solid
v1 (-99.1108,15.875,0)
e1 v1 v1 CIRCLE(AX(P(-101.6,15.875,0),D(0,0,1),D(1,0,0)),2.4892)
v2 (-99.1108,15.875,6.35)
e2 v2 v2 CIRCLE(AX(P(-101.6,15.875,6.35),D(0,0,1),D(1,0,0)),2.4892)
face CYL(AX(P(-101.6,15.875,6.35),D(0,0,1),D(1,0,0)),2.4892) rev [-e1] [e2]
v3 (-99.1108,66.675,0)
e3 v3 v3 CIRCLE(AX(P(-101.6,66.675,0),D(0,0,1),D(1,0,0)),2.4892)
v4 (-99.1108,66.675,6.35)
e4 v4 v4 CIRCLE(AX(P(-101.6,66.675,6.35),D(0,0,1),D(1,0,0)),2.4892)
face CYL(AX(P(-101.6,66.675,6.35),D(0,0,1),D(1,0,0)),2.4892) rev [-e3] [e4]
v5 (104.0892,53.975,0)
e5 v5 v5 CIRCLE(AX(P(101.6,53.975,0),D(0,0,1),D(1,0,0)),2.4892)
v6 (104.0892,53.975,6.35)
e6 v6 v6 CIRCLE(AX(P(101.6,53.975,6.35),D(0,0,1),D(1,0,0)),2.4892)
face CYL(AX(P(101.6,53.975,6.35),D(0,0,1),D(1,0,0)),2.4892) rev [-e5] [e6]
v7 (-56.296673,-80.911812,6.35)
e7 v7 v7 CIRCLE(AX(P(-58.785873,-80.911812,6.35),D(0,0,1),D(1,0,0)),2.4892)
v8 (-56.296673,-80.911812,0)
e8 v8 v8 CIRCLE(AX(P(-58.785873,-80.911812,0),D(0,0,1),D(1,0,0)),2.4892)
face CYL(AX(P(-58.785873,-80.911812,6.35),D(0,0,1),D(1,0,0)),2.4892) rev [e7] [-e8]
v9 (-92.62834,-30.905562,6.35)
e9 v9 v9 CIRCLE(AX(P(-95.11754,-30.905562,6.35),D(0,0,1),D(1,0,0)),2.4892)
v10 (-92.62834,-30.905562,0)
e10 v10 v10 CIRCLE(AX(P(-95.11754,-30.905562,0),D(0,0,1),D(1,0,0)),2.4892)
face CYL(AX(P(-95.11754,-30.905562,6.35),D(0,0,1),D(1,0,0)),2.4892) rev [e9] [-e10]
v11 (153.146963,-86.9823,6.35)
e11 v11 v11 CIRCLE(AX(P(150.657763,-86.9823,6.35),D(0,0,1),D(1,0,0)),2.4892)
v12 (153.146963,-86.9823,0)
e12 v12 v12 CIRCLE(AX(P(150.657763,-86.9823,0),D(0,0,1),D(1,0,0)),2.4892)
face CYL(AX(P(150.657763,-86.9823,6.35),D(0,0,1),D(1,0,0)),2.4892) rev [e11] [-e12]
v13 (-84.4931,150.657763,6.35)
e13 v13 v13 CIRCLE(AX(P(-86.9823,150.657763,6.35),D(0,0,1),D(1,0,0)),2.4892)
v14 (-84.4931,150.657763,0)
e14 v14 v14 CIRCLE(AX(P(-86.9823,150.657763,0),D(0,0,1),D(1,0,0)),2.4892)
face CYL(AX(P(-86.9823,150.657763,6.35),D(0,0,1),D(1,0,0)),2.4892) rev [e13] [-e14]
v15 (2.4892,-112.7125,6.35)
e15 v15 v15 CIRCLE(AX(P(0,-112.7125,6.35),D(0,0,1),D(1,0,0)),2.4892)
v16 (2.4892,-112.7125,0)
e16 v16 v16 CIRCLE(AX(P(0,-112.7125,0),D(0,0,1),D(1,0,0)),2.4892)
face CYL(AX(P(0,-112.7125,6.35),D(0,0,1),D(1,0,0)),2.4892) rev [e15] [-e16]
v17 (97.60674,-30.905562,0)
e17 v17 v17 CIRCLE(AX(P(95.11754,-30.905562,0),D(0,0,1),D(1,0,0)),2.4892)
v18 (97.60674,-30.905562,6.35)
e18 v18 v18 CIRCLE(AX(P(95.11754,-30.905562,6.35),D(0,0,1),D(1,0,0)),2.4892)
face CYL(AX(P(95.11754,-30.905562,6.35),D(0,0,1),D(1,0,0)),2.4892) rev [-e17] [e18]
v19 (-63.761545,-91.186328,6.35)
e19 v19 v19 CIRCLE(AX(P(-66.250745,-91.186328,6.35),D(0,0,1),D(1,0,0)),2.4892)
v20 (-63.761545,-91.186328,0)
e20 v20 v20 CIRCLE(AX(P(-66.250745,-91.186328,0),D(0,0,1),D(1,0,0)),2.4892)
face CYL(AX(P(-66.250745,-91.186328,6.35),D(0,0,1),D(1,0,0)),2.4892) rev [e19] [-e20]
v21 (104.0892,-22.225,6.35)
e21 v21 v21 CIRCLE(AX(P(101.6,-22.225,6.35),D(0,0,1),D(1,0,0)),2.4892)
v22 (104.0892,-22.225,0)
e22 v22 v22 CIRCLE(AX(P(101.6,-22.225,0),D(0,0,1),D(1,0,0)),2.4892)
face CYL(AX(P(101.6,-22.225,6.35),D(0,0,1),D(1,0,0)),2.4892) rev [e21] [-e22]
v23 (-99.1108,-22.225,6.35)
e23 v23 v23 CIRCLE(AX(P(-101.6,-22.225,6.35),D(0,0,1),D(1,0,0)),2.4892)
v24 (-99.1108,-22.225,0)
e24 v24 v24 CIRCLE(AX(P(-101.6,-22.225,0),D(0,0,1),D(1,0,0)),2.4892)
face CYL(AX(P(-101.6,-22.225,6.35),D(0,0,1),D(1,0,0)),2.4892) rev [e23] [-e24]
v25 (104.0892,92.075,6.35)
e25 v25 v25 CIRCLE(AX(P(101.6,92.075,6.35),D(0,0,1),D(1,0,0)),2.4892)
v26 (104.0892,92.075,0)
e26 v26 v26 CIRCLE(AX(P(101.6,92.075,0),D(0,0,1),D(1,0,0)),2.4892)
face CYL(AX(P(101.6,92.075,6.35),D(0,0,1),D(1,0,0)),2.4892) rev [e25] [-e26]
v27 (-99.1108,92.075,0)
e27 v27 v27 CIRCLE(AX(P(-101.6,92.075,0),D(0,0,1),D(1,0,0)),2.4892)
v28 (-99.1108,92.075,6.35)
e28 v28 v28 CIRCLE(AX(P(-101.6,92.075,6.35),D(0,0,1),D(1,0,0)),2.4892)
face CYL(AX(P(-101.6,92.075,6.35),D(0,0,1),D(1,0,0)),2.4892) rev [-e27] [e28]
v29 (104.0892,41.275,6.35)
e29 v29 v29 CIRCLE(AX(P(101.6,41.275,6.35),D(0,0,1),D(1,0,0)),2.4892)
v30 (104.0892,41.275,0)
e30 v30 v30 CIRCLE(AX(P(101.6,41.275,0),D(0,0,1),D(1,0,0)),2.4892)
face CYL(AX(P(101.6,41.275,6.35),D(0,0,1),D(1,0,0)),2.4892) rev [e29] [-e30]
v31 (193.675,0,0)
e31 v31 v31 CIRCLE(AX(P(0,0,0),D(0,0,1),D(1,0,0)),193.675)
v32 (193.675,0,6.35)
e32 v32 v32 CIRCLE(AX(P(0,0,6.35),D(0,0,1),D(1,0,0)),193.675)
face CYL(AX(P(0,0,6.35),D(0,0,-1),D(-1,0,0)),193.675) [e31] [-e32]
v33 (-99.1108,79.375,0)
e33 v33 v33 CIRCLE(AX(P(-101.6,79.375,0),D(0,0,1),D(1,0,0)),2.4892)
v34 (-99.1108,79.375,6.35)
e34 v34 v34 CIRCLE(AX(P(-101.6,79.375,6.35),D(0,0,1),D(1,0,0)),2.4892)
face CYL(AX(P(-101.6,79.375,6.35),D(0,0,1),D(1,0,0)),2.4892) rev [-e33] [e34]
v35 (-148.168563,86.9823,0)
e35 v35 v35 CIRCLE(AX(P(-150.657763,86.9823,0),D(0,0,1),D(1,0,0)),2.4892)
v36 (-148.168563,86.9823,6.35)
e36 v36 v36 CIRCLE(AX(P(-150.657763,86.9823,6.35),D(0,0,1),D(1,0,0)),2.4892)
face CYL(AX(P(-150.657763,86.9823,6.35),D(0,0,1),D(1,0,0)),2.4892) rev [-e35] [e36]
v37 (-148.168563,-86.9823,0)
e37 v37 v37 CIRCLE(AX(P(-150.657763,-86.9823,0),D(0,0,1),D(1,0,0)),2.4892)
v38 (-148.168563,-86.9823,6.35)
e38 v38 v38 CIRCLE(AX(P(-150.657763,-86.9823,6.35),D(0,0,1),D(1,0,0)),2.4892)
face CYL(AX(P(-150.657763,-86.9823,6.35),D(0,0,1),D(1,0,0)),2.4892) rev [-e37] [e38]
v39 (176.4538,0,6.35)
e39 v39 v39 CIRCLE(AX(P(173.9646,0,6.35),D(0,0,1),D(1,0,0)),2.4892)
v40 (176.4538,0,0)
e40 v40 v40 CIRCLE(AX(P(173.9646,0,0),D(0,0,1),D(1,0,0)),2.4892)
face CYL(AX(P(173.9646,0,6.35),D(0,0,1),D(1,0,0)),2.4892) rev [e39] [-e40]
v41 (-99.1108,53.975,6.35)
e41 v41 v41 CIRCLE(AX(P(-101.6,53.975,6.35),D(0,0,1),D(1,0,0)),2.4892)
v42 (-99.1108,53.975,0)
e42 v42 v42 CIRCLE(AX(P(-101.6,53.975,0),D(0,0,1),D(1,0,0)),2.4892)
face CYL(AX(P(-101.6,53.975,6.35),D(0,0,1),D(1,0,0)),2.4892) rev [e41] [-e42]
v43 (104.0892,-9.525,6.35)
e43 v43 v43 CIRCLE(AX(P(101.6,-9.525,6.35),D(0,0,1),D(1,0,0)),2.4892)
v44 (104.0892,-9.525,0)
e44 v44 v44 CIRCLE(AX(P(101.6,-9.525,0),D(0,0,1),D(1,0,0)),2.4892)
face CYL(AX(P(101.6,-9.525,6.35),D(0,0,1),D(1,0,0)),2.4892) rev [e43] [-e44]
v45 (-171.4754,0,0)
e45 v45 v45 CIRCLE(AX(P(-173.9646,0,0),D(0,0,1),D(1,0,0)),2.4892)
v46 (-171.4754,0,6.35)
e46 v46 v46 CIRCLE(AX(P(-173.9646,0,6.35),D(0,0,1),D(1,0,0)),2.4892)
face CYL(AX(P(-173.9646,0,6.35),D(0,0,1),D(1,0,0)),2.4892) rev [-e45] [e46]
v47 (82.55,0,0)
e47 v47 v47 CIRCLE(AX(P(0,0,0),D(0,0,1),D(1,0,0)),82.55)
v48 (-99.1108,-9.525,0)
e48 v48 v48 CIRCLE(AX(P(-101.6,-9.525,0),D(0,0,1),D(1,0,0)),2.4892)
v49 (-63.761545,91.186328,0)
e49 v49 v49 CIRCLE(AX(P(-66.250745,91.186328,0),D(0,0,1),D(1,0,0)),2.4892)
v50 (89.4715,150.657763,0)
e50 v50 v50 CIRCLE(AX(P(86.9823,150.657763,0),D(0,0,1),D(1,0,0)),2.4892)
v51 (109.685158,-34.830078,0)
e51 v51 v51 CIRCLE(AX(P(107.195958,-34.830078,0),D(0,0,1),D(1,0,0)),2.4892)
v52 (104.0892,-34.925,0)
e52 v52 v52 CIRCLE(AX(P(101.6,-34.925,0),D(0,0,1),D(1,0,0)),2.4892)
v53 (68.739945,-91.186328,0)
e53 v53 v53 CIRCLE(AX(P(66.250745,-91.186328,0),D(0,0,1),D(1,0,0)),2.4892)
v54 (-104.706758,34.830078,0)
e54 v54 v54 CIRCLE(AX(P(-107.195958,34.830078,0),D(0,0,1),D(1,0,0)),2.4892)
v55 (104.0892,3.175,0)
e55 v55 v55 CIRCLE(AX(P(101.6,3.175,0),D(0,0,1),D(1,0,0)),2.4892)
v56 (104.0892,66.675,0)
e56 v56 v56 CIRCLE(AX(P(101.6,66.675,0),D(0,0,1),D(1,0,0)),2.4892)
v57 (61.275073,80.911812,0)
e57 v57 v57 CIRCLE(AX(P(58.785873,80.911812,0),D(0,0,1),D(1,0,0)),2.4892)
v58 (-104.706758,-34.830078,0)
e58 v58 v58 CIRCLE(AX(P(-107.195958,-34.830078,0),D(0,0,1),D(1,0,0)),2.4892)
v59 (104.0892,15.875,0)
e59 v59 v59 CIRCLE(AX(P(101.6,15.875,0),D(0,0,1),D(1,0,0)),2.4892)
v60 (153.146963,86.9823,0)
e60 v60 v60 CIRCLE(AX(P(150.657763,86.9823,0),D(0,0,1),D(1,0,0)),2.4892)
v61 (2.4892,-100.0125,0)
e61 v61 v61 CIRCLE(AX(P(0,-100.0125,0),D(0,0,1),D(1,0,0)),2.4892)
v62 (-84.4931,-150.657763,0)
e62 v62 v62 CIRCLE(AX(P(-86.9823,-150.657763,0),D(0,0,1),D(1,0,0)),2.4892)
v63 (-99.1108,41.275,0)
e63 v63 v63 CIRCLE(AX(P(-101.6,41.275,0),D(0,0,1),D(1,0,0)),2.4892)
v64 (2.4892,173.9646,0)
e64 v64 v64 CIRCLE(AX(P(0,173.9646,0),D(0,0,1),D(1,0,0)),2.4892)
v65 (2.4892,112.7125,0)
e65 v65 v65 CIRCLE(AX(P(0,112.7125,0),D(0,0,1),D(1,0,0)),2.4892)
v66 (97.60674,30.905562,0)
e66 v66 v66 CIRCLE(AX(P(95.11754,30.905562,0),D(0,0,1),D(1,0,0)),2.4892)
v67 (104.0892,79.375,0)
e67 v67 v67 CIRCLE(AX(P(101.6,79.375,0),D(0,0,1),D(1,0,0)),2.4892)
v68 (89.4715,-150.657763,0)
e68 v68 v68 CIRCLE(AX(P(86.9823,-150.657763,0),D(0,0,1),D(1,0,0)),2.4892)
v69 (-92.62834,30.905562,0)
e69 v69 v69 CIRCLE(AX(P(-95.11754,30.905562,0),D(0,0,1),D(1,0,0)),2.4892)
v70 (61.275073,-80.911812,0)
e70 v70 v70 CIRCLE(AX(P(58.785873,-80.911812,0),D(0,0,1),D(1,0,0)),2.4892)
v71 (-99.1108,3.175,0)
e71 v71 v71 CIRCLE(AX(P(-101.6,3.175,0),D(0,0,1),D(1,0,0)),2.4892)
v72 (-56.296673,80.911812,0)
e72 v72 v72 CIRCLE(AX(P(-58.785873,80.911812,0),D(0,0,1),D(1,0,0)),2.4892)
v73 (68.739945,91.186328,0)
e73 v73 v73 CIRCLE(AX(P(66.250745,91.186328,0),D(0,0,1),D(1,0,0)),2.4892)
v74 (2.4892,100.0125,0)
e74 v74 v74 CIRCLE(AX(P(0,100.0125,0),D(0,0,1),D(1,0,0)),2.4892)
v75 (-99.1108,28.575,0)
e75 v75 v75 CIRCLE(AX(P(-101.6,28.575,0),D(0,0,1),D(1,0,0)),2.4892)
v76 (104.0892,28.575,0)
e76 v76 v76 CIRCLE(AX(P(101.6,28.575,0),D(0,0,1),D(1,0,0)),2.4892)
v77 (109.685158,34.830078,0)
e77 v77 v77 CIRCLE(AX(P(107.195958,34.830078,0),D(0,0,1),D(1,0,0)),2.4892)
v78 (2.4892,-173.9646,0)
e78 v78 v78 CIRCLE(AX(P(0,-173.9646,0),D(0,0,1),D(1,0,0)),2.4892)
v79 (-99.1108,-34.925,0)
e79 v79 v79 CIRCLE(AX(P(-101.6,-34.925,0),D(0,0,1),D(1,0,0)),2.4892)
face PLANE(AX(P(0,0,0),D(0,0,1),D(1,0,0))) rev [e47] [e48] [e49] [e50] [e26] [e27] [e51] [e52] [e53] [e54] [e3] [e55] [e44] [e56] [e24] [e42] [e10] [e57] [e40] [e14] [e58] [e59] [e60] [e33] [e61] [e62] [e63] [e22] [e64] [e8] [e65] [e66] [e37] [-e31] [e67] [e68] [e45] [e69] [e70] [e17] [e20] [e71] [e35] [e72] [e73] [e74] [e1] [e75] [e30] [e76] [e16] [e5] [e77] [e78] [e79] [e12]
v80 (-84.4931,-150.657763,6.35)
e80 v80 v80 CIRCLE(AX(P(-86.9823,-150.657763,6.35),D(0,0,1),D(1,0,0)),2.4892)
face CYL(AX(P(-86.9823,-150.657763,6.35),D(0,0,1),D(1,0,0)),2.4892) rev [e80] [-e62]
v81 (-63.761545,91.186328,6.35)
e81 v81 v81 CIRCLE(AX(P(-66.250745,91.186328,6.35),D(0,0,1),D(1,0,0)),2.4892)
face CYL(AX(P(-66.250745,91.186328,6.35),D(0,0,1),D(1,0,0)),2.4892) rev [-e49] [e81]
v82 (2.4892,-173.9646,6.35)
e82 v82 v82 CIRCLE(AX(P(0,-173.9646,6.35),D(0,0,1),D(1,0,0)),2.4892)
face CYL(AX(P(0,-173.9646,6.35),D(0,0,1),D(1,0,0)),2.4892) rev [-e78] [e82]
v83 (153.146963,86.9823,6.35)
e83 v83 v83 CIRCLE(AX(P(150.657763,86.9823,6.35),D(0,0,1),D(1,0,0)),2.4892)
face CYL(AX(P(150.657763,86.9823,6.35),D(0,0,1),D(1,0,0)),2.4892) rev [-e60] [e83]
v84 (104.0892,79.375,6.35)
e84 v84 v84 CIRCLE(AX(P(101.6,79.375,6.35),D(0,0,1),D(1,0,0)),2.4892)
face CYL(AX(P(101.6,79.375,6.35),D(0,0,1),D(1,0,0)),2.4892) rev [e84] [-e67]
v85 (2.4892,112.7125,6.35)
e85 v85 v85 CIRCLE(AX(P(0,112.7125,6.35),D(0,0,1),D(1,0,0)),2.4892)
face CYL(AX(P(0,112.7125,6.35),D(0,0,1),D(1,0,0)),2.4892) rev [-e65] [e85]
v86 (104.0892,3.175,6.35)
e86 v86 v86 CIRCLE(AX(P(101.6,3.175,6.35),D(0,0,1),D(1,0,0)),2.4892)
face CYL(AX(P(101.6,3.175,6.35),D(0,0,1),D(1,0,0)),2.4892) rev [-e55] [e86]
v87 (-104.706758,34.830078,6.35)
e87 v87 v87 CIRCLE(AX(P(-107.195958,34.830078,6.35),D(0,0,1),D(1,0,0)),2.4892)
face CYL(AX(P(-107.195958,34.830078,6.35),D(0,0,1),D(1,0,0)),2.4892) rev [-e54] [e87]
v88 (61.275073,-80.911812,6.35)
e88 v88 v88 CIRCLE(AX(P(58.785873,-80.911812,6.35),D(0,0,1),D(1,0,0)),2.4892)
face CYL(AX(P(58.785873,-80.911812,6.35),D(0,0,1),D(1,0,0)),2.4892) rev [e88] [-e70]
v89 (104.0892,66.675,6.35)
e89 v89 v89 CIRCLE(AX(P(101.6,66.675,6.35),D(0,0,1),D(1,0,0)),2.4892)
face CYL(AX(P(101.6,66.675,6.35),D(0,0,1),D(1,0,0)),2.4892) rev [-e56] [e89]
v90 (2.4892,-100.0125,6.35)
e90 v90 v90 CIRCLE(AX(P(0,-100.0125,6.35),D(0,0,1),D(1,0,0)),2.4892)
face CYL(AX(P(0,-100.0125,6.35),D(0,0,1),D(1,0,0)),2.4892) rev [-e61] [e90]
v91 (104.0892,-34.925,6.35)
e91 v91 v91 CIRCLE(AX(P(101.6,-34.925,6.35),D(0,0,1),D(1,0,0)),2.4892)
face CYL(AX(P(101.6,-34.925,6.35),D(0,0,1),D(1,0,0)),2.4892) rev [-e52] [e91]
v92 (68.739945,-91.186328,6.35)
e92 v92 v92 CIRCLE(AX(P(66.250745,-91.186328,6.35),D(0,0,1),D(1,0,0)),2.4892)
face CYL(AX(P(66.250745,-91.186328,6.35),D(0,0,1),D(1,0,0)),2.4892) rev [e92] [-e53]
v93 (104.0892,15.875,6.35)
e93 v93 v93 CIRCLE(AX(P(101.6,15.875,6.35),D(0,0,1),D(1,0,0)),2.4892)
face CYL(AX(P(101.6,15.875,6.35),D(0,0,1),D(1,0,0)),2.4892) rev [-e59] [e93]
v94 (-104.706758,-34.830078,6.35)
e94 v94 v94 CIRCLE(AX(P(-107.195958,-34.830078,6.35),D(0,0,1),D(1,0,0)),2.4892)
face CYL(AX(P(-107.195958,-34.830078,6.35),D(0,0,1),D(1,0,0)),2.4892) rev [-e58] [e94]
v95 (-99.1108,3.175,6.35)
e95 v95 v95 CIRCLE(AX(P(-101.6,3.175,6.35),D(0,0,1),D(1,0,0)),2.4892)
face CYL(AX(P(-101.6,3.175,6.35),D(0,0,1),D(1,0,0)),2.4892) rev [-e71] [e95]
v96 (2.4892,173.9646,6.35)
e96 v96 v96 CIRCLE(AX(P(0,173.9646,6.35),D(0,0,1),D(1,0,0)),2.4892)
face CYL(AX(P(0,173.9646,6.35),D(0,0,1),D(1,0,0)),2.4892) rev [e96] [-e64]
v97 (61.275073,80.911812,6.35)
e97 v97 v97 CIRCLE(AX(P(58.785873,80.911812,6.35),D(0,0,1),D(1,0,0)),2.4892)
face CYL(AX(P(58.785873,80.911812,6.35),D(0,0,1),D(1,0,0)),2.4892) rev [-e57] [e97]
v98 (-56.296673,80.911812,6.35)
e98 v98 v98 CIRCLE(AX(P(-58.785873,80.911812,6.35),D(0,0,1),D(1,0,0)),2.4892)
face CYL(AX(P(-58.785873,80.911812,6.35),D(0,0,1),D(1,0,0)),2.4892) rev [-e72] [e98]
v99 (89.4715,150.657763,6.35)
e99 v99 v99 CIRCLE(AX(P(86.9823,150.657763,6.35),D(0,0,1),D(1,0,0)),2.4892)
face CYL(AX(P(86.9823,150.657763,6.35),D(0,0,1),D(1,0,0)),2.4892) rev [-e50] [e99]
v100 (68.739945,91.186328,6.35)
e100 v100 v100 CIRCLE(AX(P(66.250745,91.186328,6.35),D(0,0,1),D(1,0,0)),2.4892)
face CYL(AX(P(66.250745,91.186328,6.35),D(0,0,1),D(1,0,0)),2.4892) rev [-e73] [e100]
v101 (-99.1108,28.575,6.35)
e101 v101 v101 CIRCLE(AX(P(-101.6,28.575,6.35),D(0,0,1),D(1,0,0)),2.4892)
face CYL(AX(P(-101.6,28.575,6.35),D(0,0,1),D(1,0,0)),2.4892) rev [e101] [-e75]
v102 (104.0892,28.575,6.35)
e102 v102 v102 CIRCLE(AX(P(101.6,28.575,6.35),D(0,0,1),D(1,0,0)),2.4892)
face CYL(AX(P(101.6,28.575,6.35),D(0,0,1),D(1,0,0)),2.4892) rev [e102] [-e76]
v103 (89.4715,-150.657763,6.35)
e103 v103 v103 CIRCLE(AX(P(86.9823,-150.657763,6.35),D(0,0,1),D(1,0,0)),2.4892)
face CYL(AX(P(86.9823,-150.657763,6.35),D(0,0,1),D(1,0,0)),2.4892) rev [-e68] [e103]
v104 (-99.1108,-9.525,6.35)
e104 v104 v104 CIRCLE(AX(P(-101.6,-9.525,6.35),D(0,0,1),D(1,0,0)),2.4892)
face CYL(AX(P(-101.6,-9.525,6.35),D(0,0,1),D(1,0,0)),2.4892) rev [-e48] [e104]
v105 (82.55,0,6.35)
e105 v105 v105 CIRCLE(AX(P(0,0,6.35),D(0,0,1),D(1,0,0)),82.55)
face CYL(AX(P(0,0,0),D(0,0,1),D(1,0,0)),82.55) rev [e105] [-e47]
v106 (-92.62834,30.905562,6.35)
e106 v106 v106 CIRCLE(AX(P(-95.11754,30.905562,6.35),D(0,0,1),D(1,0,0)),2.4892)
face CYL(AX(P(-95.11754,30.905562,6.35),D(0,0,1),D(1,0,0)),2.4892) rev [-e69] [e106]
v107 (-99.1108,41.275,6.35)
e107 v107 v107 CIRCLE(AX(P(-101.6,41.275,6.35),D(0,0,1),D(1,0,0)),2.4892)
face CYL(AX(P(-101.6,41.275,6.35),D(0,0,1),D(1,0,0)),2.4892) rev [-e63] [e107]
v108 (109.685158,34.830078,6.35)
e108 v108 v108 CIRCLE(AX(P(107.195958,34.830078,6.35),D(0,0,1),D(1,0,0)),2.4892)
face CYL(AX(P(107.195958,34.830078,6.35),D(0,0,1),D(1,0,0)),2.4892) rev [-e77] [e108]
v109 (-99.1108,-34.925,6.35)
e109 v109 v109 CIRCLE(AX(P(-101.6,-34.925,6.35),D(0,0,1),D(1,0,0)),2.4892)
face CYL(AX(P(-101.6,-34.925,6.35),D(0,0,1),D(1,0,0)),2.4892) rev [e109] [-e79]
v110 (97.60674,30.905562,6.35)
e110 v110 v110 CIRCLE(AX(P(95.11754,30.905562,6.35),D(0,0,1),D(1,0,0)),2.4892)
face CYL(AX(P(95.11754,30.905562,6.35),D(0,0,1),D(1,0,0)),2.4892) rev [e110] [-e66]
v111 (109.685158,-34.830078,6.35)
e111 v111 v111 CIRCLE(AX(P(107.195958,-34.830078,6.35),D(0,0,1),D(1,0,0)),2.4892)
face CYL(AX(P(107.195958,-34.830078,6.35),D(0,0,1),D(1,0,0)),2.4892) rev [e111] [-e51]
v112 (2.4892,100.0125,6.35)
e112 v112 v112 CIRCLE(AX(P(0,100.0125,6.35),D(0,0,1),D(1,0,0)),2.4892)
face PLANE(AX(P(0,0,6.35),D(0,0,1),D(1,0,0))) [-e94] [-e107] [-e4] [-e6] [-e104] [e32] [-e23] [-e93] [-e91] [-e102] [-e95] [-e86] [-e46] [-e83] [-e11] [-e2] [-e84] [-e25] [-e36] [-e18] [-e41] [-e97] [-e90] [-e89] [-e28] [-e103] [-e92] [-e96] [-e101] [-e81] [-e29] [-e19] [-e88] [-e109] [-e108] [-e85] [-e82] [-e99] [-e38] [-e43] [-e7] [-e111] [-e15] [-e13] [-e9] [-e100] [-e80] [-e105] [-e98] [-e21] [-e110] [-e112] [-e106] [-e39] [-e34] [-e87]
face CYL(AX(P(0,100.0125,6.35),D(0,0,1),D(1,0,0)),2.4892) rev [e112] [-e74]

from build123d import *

# Parameters (mm, degrees)
SKETCH1_R                          = 193.675
BOSS_EXTRUDE1_DEPTH                = 6.35
F_9_0_196_DIAMETER_HOLE1_D         = 4.9784
SKETCH5_R                          = 82.55
CUT_EXTRUDE1_DEPTH                 = 6.35
F_9_0_196_DIAMETER_HOLE2_D         = 4.9784
F_9_0_196_DIAMETER_HOLE3_OUTLINE_R = 2.4892
F_9_0_196_DIAMETER_HOLE3_DEPTH     = 6.35


# Read off the part's stored shape, not the designer's step: #9 (0.196) Diameter Hole3
with BuildPart() as part:
    # Sketch1 → Boss-Extrude1 (new body)
    with BuildSketch(Plane(origin=(0, 0, 0), x_dir=(0, 1, 0), z_dir=(0, 0, 1))):
        with Locations(Location((0, 0, 0), (0, 0, 270))):
            Circle(SKETCH1_R)
    extrude(amount=BOSS_EXTRUDE1_DEPTH)

    # #9 (0.196) Diameter Hole1 (through all)
    with Locations(Plane.XY.offset(6.35)):
        with Locations((-150.657762959, 86.9823), (-173.9646, 0), (-150.657762959, -86.9823), (-86.9823, -150.657762959), (0, -173.9646), (86.9823, -150.657762959), (150.657762959, -86.9823), (173.9646, 0), (150.657762959, 86.9823), (86.9823, 150.657762959), (0, 173.9646), (-86.9823, 150.657762959)):
            Hole(F_9_0_196_DIAMETER_HOLE1_D / 2)

    # Sketch5 → Cut-Extrude1 (cut)
    with BuildSketch(Plane.XY.offset(6.35)):
        Circle(SKETCH5_R)
    extrude(amount=-CUT_EXTRUDE1_DEPTH, mode=Mode.SUBTRACT)

    # #9 (0.196) Diameter Hole2 (through all)
    with Locations(Plane.XY.offset(6.35)):
        with Locations((101.6, 92.075), (101.6, 79.375), (101.6, 66.675), (101.6, 53.975), (101.6, 41.275), (101.6, 28.575), (101.6, 15.875), (101.6, 3.175), (101.6, -9.525), (101.6, -22.225), (101.6, -34.925), (-101.6, 92.075), (-101.6, 79.375), (-101.6, 66.675), (-101.6, 53.975), (-101.6, 41.275), (-101.6, 28.575), (-101.6, 15.875), (-101.6, 3.175), (-101.6, -9.525), (-101.6, -22.225), (-101.6, -34.925)):
            Hole(F_9_0_196_DIAMETER_HOLE2_D / 2)

    # #9 (0.196) Diameter Hole3 outline → #9 (0.196) Diameter Hole3 (cut)
    with BuildSketch(Plane.XY):
        with Locations((66.250745249, -91.186327978)):
            Circle(F_9_0_196_DIAMETER_HOLE3_OUTLINE_R)
        with Locations((58.785872545, -80.91181215)):
            Circle(F_9_0_196_DIAMETER_HOLE3_OUTLINE_R)
        with Locations((107.195957593, -34.830077978)):
            Circle(F_9_0_196_DIAMETER_HOLE3_OUTLINE_R)
        with Locations((95.117539836, -30.90556215)):
            Circle(F_9_0_196_DIAMETER_HOLE3_OUTLINE_R)
        with Locations((107.195957593, 34.830077978)):
            Circle(F_9_0_196_DIAMETER_HOLE3_OUTLINE_R)
        with Locations((95.117539836, 30.90556215)):
            Circle(F_9_0_196_DIAMETER_HOLE3_OUTLINE_R)
        with Locations((66.250745249, 91.186327978)):
            Circle(F_9_0_196_DIAMETER_HOLE3_OUTLINE_R)
        with Locations((58.785872545, 80.91181215)):
            Circle(F_9_0_196_DIAMETER_HOLE3_OUTLINE_R)
        with Locations((0, 112.7125)):
            Circle(F_9_0_196_DIAMETER_HOLE3_OUTLINE_R)
        with Locations((0, 100.0125)):
            Circle(F_9_0_196_DIAMETER_HOLE3_OUTLINE_R)
        with Locations((-66.250745249, 91.186327978)):
            Circle(F_9_0_196_DIAMETER_HOLE3_OUTLINE_R)
        with Locations((-58.785872545, 80.91181215)):
            Circle(F_9_0_196_DIAMETER_HOLE3_OUTLINE_R)
        with Locations((-107.195957593, 34.830077978)):
            Circle(F_9_0_196_DIAMETER_HOLE3_OUTLINE_R)
        with Locations((-95.117539836, 30.90556215)):
            Circle(F_9_0_196_DIAMETER_HOLE3_OUTLINE_R)
        with Locations((-107.195957593, -34.830077978)):
            Circle(F_9_0_196_DIAMETER_HOLE3_OUTLINE_R)
        with Locations((-95.117539836, -30.90556215)):
            Circle(F_9_0_196_DIAMETER_HOLE3_OUTLINE_R)
        with Locations((-66.250745249, -91.186327978)):
            Circle(F_9_0_196_DIAMETER_HOLE3_OUTLINE_R)
        with Locations((-58.785872545, -80.91181215)):
            Circle(F_9_0_196_DIAMETER_HOLE3_OUTLINE_R)
        with Locations((0, -112.7125)):
            Circle(F_9_0_196_DIAMETER_HOLE3_OUTLINE_R)
        with Locations((0, -100.0125)):
            Circle(F_9_0_196_DIAMETER_HOLE3_OUTLINE_R)
    extrude(amount=F_9_0_196_DIAMETER_HOLE3_DEPTH, mode=Mode.SUBTRACT)


solid = part.part
